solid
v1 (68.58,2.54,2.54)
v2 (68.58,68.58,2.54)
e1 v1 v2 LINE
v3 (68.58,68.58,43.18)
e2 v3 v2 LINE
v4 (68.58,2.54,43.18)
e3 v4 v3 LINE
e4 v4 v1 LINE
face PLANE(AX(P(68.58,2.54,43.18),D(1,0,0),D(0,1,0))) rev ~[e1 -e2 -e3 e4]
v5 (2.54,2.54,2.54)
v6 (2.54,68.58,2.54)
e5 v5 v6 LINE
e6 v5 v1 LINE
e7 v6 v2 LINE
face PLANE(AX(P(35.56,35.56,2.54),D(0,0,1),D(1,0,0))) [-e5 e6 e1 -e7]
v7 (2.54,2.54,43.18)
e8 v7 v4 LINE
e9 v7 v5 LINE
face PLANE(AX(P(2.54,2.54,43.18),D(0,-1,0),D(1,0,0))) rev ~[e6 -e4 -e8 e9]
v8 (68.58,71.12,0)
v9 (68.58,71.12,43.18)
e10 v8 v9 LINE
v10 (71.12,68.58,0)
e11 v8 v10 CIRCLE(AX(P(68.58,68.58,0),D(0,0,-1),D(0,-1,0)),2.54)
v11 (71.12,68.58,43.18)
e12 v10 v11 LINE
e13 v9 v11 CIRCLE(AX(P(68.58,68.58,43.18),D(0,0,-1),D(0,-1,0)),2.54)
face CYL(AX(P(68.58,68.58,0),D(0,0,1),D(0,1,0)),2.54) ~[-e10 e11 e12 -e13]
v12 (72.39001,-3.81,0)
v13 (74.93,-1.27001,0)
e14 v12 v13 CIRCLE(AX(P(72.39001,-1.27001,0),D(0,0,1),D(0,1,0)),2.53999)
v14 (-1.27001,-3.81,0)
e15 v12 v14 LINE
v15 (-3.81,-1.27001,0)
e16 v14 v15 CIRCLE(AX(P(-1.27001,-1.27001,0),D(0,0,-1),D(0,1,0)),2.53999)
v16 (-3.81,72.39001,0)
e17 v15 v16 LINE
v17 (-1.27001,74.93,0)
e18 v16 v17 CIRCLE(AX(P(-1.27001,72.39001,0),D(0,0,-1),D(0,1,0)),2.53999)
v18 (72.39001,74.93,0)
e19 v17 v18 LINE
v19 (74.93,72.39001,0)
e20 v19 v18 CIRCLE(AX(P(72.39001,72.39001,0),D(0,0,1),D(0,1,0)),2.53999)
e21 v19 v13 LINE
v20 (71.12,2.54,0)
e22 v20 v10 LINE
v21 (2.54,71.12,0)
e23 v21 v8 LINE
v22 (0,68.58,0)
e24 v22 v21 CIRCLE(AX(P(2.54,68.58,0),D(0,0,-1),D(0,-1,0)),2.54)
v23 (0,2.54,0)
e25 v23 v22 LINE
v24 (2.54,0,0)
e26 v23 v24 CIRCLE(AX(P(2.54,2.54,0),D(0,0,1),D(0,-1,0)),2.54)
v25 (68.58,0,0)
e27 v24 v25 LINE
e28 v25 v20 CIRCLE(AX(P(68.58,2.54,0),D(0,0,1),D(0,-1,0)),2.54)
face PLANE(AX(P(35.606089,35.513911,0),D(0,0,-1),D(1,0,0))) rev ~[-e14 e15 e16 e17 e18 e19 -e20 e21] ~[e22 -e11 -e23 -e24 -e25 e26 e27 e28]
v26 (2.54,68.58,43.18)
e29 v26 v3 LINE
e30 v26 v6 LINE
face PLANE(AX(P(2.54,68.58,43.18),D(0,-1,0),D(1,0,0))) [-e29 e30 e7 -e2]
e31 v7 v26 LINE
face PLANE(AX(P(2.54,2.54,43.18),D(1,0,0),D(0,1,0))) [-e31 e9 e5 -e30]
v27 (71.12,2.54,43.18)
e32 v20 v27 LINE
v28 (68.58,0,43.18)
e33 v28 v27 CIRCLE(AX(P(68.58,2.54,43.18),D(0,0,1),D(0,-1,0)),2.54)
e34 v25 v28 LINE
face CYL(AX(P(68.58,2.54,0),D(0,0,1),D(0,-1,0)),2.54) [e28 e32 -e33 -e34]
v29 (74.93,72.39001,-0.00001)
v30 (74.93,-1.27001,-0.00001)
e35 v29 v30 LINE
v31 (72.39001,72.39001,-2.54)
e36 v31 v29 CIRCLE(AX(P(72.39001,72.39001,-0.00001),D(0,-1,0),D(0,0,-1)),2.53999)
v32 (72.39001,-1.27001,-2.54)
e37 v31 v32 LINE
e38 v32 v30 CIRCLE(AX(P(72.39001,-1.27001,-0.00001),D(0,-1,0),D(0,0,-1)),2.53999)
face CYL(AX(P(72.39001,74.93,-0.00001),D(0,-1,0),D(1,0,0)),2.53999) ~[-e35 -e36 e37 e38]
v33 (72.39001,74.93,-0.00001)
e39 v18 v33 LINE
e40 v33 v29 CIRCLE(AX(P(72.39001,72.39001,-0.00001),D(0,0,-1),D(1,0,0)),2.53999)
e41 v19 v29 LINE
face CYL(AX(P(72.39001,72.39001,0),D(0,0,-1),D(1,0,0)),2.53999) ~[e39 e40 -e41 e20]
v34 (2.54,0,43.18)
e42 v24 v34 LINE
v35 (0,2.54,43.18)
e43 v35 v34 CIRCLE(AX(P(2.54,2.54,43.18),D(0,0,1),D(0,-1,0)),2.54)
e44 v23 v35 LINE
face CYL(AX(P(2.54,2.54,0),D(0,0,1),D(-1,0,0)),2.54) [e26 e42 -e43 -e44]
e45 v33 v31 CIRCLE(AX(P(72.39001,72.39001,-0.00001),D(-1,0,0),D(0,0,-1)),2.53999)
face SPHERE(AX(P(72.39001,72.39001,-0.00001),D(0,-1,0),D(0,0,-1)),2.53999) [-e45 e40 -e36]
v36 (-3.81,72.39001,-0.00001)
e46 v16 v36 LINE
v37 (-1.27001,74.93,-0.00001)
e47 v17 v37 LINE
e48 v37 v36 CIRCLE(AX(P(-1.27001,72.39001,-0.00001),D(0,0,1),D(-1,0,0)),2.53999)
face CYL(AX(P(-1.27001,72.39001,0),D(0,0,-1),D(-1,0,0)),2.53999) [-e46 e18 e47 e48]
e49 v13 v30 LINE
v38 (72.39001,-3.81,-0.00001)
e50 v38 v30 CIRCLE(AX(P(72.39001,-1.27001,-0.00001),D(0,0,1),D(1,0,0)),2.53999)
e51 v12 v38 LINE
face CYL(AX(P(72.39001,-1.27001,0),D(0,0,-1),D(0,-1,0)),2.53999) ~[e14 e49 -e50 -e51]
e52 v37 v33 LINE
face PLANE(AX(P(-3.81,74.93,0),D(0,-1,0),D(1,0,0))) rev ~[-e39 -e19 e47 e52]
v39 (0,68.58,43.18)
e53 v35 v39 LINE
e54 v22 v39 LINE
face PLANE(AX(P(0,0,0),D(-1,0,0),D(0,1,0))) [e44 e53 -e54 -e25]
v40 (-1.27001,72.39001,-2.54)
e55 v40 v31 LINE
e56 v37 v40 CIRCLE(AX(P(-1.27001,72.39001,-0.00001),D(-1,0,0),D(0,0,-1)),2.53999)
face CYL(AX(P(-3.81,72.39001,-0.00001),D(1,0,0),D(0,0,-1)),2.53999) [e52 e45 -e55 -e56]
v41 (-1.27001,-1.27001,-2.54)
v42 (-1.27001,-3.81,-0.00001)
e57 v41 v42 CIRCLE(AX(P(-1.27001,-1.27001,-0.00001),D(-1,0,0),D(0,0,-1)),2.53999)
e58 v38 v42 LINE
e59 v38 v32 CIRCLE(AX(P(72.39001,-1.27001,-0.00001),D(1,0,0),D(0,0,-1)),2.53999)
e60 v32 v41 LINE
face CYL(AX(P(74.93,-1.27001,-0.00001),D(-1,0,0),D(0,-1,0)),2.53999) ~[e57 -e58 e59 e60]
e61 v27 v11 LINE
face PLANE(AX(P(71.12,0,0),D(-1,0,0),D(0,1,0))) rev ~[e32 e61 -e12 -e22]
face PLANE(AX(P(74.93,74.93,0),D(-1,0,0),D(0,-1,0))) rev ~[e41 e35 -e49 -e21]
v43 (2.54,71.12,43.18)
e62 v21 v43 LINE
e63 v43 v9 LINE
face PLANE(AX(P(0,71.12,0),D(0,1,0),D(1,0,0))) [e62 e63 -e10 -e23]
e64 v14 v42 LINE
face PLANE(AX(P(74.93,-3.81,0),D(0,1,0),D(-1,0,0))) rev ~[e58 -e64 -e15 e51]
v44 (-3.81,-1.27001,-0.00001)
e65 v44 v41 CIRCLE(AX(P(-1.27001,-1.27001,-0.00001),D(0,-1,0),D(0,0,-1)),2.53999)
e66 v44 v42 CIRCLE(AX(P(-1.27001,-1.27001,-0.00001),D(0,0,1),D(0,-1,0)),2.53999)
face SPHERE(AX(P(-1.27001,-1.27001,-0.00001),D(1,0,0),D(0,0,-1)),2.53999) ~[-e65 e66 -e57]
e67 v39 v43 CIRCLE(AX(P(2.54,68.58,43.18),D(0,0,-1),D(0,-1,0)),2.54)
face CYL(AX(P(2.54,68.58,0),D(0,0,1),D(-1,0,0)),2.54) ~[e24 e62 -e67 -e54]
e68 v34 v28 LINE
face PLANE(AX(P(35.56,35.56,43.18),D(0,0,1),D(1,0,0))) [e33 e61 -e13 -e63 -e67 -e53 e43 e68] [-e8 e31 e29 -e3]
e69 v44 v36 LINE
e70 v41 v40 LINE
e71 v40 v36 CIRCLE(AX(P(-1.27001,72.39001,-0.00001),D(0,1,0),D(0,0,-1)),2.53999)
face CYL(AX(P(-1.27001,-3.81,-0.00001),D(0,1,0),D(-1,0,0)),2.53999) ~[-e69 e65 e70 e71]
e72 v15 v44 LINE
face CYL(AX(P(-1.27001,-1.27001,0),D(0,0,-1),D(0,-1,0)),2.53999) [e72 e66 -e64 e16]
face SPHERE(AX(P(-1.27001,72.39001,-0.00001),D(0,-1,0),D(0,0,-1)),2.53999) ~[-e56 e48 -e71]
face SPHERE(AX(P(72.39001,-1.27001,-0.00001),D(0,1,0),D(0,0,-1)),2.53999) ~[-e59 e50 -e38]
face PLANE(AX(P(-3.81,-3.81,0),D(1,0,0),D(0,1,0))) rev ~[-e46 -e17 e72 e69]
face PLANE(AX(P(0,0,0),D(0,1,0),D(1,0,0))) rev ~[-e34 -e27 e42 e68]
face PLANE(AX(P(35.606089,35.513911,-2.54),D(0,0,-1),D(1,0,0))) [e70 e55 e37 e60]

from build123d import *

# Parameters (mm, degrees)
F0_W     = 71.12
F0_H     = 71.12
F1_DEPTH = 43.18
F2_W     = 66.04
F2_H     = 66.04
F3_DEPTH = 40.64
F5_R     = 2.54
F4_W     = 71.12
F4_H     = 71.12
F4_W_2   = 3.81
F4_H_2   = 3.81
F6_DEPTH = 2.54
F7_R     = 2.53999


# Not quite as in the source:
# - a fillet or chamfer is up to 0.001 mm smaller than in the source, because OpenCascade refuses the exact size


with BuildPart() as f1:
    # F0 (on Top) → F1 (new body)
    with BuildSketch(Plane.XY):
        with Locations((35.56, 35.56)):
            Rectangle(F0_W, F0_H)
    extrude(amount=F1_DEPTH)

    # F2 (on face) → F3 (cut)
    with BuildSketch(Plane.XY.offset(43.18)):
        with Locations((35.56, 35.56)):
            Rectangle(F2_W, F2_H)
    extrude(amount=-F3_DEPTH, mode=Mode.SUBTRACT)

    # F5
    f5_edges = [f1.edges().sort_by_distance(p)[0] for p in [
        (71.12, 0, 21.59),
        (0, 0, 21.59),
        (0, 71.12, 21.59),
        (71.12, 71.12, 21.59),
    ]]
    fillet(f5_edges, radius=F5_R)

    # F4 (on face) → F6 (join)
    with BuildSketch(Plane(origin=(0, 0, 0), x_dir=(1, 0, 0), z_dir=(0, 0, -1))):
        Polygon((-3.81, -71.12), (0, -71.12), (0, -74.93), (74.93, -74.93), (74.93, 3.81), (-3.81, 3.81), align=None)
        with Locations((35.56, -35.56)):
            Rectangle(F4_W, F4_H, mode=Mode.SUBTRACT)
        with Locations((-1.905, -73.025)):
            Rectangle(F4_W_2, F4_H_2)
        with Locations((35.56, -35.56)):
            Rectangle(F4_W, F4_H)
    extrude(amount=F6_DEPTH)

    # F7 (radius 2.54 in the source; OpenCascade refuses exactly that, so slightly less here)
    f7_edges = [f1.edges().sort_by_distance(p)[0] for p in [
        (74.93, 35.56, -2.54),
        (35.56, -3.81, -2.54),
        (-3.81, 35.56, -2.54),
        (35.56, 74.93, -2.54),
        (-3.81, 74.93, -1.27),
        (74.93, 74.93, -1.27),
        (74.93, -3.81, -1.27),
        (-3.81, -3.81, -1.27),
    ]]
    fillet(f7_edges, radius=F7_R)


solid = f1.part
